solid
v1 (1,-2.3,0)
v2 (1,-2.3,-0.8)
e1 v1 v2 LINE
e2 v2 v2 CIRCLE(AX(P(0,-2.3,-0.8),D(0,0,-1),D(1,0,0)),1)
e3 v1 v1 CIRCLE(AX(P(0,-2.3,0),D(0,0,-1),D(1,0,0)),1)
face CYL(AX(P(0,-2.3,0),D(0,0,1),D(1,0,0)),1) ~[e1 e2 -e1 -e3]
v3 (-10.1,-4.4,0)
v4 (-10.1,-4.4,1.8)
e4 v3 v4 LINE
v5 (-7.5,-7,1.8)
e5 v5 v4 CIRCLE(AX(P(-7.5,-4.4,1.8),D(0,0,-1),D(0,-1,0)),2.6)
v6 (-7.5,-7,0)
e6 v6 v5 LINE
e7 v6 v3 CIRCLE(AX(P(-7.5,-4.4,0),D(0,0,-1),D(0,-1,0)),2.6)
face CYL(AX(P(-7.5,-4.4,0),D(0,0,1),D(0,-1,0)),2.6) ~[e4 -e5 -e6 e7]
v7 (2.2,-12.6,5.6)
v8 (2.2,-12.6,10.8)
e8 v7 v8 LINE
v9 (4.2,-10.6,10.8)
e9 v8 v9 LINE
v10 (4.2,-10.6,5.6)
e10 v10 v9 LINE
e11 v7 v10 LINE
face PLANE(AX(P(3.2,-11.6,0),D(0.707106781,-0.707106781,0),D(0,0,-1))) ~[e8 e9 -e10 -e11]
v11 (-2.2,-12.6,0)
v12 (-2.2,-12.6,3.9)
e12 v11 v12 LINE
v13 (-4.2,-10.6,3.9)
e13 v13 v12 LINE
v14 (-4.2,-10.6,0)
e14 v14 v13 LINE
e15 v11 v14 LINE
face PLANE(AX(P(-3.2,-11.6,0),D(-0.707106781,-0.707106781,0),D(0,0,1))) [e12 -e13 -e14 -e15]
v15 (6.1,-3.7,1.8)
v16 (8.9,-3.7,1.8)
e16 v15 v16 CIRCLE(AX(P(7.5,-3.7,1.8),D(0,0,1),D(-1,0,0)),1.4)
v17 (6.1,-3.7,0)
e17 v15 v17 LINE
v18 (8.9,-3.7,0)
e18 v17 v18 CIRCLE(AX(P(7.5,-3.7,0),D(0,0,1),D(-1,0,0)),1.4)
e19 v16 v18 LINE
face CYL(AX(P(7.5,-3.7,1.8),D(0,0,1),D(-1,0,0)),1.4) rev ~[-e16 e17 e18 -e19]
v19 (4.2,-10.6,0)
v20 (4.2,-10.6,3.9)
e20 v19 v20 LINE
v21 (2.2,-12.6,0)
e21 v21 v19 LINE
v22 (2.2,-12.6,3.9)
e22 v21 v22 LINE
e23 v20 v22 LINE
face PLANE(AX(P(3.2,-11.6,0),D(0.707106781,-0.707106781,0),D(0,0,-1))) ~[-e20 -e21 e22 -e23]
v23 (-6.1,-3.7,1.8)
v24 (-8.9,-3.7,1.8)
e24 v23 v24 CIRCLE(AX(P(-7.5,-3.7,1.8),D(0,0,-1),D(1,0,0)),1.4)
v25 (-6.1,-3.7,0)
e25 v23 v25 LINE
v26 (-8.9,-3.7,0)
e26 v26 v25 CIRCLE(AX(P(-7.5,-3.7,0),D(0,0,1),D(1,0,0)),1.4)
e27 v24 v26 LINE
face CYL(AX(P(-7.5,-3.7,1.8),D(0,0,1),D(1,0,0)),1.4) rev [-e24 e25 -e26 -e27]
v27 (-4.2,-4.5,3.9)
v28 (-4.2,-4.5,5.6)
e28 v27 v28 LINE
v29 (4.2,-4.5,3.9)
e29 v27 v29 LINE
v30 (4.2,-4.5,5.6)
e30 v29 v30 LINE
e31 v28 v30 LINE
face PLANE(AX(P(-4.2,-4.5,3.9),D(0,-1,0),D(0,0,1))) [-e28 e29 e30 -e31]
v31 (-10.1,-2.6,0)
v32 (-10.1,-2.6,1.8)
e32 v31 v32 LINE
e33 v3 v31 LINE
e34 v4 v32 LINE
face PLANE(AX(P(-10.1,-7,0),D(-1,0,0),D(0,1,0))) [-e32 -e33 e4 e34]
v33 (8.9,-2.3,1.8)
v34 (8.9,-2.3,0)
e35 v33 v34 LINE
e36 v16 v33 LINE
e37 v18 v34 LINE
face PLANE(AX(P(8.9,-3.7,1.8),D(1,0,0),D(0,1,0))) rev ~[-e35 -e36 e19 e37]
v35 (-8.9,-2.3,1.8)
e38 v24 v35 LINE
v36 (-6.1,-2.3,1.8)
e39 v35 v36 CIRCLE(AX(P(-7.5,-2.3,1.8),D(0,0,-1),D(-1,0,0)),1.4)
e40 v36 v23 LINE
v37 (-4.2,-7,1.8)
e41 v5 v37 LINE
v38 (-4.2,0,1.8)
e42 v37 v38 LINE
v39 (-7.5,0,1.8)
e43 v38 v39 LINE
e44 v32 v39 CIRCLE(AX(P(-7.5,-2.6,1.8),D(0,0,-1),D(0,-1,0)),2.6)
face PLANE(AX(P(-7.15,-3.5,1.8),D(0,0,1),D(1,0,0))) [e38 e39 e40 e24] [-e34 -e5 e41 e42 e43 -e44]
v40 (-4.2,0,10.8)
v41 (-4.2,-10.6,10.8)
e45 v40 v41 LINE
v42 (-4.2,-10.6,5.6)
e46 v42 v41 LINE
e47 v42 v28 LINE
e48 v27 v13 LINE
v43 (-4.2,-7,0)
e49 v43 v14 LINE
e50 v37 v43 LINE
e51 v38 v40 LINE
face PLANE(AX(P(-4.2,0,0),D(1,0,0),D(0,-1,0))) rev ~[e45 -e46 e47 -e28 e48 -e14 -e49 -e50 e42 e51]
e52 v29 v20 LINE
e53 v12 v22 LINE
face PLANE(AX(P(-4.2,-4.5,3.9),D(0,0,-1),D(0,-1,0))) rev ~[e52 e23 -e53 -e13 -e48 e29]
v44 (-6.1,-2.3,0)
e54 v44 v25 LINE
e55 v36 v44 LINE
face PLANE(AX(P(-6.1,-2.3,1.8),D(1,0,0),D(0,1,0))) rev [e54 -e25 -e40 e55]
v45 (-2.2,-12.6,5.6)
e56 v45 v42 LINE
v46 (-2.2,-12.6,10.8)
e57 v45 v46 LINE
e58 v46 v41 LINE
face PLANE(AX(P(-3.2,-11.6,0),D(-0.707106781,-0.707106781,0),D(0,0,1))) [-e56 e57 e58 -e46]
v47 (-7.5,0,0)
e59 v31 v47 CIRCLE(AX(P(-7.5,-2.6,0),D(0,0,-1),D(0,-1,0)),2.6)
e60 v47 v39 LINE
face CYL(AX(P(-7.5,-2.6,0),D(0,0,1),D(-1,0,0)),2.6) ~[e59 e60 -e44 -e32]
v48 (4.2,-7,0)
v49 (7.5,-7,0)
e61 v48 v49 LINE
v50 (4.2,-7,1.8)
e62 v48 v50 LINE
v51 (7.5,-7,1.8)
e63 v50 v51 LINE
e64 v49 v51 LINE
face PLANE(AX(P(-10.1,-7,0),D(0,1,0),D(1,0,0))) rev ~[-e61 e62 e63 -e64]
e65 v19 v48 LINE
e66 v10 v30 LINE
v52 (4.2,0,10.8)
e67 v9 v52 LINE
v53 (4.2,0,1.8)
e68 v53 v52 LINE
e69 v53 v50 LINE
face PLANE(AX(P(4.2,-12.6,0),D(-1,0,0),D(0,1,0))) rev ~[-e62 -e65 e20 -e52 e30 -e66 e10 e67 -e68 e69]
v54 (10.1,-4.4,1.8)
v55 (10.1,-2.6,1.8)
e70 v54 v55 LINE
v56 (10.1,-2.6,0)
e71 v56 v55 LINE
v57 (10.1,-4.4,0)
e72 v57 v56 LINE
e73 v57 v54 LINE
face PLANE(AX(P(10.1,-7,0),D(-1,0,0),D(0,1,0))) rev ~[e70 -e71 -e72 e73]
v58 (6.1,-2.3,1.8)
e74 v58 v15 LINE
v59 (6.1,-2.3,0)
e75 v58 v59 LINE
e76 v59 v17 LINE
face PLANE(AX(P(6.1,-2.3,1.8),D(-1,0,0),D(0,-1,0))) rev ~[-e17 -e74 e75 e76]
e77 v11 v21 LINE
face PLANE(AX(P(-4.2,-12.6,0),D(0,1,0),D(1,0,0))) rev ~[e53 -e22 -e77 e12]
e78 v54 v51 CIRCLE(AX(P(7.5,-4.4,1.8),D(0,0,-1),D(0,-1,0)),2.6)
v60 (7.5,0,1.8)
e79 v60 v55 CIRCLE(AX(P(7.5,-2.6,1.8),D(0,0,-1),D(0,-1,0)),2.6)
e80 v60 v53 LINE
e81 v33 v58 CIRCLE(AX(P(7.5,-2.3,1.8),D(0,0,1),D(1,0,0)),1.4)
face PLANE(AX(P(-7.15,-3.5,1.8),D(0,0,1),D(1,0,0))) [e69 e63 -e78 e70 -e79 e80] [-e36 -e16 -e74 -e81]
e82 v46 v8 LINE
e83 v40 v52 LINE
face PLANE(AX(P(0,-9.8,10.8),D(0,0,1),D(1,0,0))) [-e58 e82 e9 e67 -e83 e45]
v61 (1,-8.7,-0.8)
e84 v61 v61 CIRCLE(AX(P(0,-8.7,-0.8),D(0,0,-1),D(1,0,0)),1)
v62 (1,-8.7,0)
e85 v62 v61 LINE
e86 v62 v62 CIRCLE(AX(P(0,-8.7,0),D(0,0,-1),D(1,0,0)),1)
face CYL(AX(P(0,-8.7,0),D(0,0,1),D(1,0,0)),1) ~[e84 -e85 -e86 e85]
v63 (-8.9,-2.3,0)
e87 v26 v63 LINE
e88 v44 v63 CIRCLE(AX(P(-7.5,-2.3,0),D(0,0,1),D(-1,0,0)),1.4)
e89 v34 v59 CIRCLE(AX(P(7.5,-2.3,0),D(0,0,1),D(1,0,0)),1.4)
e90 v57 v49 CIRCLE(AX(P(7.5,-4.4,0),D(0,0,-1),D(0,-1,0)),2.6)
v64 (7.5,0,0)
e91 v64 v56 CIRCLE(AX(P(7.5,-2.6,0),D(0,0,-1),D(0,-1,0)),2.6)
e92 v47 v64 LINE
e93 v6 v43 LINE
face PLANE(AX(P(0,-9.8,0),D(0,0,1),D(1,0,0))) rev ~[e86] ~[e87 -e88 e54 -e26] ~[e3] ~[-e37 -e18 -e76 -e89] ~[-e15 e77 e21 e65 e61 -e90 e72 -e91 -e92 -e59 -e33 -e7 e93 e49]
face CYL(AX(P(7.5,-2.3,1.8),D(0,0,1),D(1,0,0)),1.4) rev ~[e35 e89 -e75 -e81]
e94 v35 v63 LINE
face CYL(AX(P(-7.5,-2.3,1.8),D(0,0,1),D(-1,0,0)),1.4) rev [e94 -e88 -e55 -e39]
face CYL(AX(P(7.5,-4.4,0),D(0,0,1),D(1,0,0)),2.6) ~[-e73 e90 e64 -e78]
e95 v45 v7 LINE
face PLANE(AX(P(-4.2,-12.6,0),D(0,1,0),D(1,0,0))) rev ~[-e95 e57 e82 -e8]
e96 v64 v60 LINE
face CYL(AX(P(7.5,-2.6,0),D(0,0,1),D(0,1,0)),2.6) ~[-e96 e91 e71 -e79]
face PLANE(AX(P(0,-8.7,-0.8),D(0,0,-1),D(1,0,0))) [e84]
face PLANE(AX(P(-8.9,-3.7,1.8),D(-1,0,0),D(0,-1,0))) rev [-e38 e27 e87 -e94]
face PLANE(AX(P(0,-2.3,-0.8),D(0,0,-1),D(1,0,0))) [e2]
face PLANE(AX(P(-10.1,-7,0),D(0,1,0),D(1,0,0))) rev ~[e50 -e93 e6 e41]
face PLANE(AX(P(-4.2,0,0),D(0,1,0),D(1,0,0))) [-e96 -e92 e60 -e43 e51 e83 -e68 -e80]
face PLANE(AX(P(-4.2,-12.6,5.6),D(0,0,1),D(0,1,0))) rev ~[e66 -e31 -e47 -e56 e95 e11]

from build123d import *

# Parameters (mm, degrees)
F0_W     = 5.9
F0_H     = 7
F0_W_2   = 8.4
F1_DEPTH = 1.8
F0_H_2   = 5.6
F2_DEPTH = 10.8
F3_SIZE  = 2
F4_R     = 1
F5_DEPTH = 0.8
F7_DEPTH = 2.601
F8_W     = 2
F8_H     = 1.7
F8_W_2   = 6.1
F9_DEPTH = 14.301
F10_R    = 2.6


# Not quite as in the source:
# - a pattern or mirror of a feature is missing from the dataset's text; its kind, count and spacing are read off the source's solid


with BuildPart() as f1:
    # F0 (on Top) → F1 (new body)
    with BuildSketch(Plane.XY):
        with Locations((-7.15, -3.5)):
            Rectangle(F0_W, F0_H)
        with Locations((0, -3.5)):
            Rectangle(F0_W_2, F0_H)
        with Locations((7.15, -3.5)):
            Rectangle(F0_W, F0_H)
    extrude(amount=F1_DEPTH)

    # F0 (on Top) → F2 (join)
    with BuildSketch(Plane.XY):
        with Locations((0, -9.8)):
            Rectangle(F0_W_2, F0_H_2)
        with Locations((0, -3.5)):
            Rectangle(F0_W_2, F0_H)
    extrude(amount=F2_DEPTH)

    # F3
    f3_edges = [f1.edges().sort_by_distance(p)[0] for p in [
        (-4.2, -12.6, 5.4),
        (4.2, -12.6, 5.4),
    ]]
    chamfer(f3_edges, length=F3_SIZE)

    # F4 (on face) → F5 (join)
    with BuildSketch(Plane(origin=(0, 0, 0), x_dir=(1, 0, 0), z_dir=(0, 0, -1))):
        with Locations((0, 2.3)):
            Circle(F4_R)
        with Locations((0, 8.7)):
            Circle(F4_R)
    extrude(amount=F5_DEPTH)

    # F6 (on face) → F7 (cut, through all)
    with BuildSketch(Plane.XY.offset(1.8)):
        with BuildLine():
            Line((8.9, -3.7), (8.9, -2.3))
            ThreePointArc((8.9, -2.3), (7.5, -0.9), (6.1, -2.3))
            Line((6.1, -2.3), (6.1, -3.7))
            ThreePointArc((6.1, -3.7), (7.5, -5.1), (8.9, -3.7))
        make_face()
    f7 = extrude(amount=-F7_DEPTH, mode=Mode.SUBTRACT)

    # F7_copies: F7 across plane
    add(f7.mirror(Plane(origin=(0, 0, 0), x_dir=(0, 0, -1), z_dir=(-1, 0, 0))), mode=Mode.SUBTRACT)

    # F8 (on face) → F9 (cut, through all)
    with BuildSketch(Plane(origin=(-4.2, 0, 0), x_dir=(0, -1, 0), z_dir=(-1, 0, 0))):
        with Locations((11.6, 4.75)):
            Rectangle(F8_W, F8_H)
        with Locations((7.55, 4.75)):
            Rectangle(F8_W_2, F8_H)
    extrude(amount=-F9_DEPTH, mode=Mode.SUBTRACT)

    # F10
    f10_edges = [f1.edges().sort_by_distance(p)[0] for p in [
        (-10.1, -7, 0.9),
        (-10.1, 0, 0.9),
        (10.1, -7, 0.9),
        (10.1, 0, 0.9),
    ]]
    fillet(f10_edges, radius=F10_R)


solid = f1.part
